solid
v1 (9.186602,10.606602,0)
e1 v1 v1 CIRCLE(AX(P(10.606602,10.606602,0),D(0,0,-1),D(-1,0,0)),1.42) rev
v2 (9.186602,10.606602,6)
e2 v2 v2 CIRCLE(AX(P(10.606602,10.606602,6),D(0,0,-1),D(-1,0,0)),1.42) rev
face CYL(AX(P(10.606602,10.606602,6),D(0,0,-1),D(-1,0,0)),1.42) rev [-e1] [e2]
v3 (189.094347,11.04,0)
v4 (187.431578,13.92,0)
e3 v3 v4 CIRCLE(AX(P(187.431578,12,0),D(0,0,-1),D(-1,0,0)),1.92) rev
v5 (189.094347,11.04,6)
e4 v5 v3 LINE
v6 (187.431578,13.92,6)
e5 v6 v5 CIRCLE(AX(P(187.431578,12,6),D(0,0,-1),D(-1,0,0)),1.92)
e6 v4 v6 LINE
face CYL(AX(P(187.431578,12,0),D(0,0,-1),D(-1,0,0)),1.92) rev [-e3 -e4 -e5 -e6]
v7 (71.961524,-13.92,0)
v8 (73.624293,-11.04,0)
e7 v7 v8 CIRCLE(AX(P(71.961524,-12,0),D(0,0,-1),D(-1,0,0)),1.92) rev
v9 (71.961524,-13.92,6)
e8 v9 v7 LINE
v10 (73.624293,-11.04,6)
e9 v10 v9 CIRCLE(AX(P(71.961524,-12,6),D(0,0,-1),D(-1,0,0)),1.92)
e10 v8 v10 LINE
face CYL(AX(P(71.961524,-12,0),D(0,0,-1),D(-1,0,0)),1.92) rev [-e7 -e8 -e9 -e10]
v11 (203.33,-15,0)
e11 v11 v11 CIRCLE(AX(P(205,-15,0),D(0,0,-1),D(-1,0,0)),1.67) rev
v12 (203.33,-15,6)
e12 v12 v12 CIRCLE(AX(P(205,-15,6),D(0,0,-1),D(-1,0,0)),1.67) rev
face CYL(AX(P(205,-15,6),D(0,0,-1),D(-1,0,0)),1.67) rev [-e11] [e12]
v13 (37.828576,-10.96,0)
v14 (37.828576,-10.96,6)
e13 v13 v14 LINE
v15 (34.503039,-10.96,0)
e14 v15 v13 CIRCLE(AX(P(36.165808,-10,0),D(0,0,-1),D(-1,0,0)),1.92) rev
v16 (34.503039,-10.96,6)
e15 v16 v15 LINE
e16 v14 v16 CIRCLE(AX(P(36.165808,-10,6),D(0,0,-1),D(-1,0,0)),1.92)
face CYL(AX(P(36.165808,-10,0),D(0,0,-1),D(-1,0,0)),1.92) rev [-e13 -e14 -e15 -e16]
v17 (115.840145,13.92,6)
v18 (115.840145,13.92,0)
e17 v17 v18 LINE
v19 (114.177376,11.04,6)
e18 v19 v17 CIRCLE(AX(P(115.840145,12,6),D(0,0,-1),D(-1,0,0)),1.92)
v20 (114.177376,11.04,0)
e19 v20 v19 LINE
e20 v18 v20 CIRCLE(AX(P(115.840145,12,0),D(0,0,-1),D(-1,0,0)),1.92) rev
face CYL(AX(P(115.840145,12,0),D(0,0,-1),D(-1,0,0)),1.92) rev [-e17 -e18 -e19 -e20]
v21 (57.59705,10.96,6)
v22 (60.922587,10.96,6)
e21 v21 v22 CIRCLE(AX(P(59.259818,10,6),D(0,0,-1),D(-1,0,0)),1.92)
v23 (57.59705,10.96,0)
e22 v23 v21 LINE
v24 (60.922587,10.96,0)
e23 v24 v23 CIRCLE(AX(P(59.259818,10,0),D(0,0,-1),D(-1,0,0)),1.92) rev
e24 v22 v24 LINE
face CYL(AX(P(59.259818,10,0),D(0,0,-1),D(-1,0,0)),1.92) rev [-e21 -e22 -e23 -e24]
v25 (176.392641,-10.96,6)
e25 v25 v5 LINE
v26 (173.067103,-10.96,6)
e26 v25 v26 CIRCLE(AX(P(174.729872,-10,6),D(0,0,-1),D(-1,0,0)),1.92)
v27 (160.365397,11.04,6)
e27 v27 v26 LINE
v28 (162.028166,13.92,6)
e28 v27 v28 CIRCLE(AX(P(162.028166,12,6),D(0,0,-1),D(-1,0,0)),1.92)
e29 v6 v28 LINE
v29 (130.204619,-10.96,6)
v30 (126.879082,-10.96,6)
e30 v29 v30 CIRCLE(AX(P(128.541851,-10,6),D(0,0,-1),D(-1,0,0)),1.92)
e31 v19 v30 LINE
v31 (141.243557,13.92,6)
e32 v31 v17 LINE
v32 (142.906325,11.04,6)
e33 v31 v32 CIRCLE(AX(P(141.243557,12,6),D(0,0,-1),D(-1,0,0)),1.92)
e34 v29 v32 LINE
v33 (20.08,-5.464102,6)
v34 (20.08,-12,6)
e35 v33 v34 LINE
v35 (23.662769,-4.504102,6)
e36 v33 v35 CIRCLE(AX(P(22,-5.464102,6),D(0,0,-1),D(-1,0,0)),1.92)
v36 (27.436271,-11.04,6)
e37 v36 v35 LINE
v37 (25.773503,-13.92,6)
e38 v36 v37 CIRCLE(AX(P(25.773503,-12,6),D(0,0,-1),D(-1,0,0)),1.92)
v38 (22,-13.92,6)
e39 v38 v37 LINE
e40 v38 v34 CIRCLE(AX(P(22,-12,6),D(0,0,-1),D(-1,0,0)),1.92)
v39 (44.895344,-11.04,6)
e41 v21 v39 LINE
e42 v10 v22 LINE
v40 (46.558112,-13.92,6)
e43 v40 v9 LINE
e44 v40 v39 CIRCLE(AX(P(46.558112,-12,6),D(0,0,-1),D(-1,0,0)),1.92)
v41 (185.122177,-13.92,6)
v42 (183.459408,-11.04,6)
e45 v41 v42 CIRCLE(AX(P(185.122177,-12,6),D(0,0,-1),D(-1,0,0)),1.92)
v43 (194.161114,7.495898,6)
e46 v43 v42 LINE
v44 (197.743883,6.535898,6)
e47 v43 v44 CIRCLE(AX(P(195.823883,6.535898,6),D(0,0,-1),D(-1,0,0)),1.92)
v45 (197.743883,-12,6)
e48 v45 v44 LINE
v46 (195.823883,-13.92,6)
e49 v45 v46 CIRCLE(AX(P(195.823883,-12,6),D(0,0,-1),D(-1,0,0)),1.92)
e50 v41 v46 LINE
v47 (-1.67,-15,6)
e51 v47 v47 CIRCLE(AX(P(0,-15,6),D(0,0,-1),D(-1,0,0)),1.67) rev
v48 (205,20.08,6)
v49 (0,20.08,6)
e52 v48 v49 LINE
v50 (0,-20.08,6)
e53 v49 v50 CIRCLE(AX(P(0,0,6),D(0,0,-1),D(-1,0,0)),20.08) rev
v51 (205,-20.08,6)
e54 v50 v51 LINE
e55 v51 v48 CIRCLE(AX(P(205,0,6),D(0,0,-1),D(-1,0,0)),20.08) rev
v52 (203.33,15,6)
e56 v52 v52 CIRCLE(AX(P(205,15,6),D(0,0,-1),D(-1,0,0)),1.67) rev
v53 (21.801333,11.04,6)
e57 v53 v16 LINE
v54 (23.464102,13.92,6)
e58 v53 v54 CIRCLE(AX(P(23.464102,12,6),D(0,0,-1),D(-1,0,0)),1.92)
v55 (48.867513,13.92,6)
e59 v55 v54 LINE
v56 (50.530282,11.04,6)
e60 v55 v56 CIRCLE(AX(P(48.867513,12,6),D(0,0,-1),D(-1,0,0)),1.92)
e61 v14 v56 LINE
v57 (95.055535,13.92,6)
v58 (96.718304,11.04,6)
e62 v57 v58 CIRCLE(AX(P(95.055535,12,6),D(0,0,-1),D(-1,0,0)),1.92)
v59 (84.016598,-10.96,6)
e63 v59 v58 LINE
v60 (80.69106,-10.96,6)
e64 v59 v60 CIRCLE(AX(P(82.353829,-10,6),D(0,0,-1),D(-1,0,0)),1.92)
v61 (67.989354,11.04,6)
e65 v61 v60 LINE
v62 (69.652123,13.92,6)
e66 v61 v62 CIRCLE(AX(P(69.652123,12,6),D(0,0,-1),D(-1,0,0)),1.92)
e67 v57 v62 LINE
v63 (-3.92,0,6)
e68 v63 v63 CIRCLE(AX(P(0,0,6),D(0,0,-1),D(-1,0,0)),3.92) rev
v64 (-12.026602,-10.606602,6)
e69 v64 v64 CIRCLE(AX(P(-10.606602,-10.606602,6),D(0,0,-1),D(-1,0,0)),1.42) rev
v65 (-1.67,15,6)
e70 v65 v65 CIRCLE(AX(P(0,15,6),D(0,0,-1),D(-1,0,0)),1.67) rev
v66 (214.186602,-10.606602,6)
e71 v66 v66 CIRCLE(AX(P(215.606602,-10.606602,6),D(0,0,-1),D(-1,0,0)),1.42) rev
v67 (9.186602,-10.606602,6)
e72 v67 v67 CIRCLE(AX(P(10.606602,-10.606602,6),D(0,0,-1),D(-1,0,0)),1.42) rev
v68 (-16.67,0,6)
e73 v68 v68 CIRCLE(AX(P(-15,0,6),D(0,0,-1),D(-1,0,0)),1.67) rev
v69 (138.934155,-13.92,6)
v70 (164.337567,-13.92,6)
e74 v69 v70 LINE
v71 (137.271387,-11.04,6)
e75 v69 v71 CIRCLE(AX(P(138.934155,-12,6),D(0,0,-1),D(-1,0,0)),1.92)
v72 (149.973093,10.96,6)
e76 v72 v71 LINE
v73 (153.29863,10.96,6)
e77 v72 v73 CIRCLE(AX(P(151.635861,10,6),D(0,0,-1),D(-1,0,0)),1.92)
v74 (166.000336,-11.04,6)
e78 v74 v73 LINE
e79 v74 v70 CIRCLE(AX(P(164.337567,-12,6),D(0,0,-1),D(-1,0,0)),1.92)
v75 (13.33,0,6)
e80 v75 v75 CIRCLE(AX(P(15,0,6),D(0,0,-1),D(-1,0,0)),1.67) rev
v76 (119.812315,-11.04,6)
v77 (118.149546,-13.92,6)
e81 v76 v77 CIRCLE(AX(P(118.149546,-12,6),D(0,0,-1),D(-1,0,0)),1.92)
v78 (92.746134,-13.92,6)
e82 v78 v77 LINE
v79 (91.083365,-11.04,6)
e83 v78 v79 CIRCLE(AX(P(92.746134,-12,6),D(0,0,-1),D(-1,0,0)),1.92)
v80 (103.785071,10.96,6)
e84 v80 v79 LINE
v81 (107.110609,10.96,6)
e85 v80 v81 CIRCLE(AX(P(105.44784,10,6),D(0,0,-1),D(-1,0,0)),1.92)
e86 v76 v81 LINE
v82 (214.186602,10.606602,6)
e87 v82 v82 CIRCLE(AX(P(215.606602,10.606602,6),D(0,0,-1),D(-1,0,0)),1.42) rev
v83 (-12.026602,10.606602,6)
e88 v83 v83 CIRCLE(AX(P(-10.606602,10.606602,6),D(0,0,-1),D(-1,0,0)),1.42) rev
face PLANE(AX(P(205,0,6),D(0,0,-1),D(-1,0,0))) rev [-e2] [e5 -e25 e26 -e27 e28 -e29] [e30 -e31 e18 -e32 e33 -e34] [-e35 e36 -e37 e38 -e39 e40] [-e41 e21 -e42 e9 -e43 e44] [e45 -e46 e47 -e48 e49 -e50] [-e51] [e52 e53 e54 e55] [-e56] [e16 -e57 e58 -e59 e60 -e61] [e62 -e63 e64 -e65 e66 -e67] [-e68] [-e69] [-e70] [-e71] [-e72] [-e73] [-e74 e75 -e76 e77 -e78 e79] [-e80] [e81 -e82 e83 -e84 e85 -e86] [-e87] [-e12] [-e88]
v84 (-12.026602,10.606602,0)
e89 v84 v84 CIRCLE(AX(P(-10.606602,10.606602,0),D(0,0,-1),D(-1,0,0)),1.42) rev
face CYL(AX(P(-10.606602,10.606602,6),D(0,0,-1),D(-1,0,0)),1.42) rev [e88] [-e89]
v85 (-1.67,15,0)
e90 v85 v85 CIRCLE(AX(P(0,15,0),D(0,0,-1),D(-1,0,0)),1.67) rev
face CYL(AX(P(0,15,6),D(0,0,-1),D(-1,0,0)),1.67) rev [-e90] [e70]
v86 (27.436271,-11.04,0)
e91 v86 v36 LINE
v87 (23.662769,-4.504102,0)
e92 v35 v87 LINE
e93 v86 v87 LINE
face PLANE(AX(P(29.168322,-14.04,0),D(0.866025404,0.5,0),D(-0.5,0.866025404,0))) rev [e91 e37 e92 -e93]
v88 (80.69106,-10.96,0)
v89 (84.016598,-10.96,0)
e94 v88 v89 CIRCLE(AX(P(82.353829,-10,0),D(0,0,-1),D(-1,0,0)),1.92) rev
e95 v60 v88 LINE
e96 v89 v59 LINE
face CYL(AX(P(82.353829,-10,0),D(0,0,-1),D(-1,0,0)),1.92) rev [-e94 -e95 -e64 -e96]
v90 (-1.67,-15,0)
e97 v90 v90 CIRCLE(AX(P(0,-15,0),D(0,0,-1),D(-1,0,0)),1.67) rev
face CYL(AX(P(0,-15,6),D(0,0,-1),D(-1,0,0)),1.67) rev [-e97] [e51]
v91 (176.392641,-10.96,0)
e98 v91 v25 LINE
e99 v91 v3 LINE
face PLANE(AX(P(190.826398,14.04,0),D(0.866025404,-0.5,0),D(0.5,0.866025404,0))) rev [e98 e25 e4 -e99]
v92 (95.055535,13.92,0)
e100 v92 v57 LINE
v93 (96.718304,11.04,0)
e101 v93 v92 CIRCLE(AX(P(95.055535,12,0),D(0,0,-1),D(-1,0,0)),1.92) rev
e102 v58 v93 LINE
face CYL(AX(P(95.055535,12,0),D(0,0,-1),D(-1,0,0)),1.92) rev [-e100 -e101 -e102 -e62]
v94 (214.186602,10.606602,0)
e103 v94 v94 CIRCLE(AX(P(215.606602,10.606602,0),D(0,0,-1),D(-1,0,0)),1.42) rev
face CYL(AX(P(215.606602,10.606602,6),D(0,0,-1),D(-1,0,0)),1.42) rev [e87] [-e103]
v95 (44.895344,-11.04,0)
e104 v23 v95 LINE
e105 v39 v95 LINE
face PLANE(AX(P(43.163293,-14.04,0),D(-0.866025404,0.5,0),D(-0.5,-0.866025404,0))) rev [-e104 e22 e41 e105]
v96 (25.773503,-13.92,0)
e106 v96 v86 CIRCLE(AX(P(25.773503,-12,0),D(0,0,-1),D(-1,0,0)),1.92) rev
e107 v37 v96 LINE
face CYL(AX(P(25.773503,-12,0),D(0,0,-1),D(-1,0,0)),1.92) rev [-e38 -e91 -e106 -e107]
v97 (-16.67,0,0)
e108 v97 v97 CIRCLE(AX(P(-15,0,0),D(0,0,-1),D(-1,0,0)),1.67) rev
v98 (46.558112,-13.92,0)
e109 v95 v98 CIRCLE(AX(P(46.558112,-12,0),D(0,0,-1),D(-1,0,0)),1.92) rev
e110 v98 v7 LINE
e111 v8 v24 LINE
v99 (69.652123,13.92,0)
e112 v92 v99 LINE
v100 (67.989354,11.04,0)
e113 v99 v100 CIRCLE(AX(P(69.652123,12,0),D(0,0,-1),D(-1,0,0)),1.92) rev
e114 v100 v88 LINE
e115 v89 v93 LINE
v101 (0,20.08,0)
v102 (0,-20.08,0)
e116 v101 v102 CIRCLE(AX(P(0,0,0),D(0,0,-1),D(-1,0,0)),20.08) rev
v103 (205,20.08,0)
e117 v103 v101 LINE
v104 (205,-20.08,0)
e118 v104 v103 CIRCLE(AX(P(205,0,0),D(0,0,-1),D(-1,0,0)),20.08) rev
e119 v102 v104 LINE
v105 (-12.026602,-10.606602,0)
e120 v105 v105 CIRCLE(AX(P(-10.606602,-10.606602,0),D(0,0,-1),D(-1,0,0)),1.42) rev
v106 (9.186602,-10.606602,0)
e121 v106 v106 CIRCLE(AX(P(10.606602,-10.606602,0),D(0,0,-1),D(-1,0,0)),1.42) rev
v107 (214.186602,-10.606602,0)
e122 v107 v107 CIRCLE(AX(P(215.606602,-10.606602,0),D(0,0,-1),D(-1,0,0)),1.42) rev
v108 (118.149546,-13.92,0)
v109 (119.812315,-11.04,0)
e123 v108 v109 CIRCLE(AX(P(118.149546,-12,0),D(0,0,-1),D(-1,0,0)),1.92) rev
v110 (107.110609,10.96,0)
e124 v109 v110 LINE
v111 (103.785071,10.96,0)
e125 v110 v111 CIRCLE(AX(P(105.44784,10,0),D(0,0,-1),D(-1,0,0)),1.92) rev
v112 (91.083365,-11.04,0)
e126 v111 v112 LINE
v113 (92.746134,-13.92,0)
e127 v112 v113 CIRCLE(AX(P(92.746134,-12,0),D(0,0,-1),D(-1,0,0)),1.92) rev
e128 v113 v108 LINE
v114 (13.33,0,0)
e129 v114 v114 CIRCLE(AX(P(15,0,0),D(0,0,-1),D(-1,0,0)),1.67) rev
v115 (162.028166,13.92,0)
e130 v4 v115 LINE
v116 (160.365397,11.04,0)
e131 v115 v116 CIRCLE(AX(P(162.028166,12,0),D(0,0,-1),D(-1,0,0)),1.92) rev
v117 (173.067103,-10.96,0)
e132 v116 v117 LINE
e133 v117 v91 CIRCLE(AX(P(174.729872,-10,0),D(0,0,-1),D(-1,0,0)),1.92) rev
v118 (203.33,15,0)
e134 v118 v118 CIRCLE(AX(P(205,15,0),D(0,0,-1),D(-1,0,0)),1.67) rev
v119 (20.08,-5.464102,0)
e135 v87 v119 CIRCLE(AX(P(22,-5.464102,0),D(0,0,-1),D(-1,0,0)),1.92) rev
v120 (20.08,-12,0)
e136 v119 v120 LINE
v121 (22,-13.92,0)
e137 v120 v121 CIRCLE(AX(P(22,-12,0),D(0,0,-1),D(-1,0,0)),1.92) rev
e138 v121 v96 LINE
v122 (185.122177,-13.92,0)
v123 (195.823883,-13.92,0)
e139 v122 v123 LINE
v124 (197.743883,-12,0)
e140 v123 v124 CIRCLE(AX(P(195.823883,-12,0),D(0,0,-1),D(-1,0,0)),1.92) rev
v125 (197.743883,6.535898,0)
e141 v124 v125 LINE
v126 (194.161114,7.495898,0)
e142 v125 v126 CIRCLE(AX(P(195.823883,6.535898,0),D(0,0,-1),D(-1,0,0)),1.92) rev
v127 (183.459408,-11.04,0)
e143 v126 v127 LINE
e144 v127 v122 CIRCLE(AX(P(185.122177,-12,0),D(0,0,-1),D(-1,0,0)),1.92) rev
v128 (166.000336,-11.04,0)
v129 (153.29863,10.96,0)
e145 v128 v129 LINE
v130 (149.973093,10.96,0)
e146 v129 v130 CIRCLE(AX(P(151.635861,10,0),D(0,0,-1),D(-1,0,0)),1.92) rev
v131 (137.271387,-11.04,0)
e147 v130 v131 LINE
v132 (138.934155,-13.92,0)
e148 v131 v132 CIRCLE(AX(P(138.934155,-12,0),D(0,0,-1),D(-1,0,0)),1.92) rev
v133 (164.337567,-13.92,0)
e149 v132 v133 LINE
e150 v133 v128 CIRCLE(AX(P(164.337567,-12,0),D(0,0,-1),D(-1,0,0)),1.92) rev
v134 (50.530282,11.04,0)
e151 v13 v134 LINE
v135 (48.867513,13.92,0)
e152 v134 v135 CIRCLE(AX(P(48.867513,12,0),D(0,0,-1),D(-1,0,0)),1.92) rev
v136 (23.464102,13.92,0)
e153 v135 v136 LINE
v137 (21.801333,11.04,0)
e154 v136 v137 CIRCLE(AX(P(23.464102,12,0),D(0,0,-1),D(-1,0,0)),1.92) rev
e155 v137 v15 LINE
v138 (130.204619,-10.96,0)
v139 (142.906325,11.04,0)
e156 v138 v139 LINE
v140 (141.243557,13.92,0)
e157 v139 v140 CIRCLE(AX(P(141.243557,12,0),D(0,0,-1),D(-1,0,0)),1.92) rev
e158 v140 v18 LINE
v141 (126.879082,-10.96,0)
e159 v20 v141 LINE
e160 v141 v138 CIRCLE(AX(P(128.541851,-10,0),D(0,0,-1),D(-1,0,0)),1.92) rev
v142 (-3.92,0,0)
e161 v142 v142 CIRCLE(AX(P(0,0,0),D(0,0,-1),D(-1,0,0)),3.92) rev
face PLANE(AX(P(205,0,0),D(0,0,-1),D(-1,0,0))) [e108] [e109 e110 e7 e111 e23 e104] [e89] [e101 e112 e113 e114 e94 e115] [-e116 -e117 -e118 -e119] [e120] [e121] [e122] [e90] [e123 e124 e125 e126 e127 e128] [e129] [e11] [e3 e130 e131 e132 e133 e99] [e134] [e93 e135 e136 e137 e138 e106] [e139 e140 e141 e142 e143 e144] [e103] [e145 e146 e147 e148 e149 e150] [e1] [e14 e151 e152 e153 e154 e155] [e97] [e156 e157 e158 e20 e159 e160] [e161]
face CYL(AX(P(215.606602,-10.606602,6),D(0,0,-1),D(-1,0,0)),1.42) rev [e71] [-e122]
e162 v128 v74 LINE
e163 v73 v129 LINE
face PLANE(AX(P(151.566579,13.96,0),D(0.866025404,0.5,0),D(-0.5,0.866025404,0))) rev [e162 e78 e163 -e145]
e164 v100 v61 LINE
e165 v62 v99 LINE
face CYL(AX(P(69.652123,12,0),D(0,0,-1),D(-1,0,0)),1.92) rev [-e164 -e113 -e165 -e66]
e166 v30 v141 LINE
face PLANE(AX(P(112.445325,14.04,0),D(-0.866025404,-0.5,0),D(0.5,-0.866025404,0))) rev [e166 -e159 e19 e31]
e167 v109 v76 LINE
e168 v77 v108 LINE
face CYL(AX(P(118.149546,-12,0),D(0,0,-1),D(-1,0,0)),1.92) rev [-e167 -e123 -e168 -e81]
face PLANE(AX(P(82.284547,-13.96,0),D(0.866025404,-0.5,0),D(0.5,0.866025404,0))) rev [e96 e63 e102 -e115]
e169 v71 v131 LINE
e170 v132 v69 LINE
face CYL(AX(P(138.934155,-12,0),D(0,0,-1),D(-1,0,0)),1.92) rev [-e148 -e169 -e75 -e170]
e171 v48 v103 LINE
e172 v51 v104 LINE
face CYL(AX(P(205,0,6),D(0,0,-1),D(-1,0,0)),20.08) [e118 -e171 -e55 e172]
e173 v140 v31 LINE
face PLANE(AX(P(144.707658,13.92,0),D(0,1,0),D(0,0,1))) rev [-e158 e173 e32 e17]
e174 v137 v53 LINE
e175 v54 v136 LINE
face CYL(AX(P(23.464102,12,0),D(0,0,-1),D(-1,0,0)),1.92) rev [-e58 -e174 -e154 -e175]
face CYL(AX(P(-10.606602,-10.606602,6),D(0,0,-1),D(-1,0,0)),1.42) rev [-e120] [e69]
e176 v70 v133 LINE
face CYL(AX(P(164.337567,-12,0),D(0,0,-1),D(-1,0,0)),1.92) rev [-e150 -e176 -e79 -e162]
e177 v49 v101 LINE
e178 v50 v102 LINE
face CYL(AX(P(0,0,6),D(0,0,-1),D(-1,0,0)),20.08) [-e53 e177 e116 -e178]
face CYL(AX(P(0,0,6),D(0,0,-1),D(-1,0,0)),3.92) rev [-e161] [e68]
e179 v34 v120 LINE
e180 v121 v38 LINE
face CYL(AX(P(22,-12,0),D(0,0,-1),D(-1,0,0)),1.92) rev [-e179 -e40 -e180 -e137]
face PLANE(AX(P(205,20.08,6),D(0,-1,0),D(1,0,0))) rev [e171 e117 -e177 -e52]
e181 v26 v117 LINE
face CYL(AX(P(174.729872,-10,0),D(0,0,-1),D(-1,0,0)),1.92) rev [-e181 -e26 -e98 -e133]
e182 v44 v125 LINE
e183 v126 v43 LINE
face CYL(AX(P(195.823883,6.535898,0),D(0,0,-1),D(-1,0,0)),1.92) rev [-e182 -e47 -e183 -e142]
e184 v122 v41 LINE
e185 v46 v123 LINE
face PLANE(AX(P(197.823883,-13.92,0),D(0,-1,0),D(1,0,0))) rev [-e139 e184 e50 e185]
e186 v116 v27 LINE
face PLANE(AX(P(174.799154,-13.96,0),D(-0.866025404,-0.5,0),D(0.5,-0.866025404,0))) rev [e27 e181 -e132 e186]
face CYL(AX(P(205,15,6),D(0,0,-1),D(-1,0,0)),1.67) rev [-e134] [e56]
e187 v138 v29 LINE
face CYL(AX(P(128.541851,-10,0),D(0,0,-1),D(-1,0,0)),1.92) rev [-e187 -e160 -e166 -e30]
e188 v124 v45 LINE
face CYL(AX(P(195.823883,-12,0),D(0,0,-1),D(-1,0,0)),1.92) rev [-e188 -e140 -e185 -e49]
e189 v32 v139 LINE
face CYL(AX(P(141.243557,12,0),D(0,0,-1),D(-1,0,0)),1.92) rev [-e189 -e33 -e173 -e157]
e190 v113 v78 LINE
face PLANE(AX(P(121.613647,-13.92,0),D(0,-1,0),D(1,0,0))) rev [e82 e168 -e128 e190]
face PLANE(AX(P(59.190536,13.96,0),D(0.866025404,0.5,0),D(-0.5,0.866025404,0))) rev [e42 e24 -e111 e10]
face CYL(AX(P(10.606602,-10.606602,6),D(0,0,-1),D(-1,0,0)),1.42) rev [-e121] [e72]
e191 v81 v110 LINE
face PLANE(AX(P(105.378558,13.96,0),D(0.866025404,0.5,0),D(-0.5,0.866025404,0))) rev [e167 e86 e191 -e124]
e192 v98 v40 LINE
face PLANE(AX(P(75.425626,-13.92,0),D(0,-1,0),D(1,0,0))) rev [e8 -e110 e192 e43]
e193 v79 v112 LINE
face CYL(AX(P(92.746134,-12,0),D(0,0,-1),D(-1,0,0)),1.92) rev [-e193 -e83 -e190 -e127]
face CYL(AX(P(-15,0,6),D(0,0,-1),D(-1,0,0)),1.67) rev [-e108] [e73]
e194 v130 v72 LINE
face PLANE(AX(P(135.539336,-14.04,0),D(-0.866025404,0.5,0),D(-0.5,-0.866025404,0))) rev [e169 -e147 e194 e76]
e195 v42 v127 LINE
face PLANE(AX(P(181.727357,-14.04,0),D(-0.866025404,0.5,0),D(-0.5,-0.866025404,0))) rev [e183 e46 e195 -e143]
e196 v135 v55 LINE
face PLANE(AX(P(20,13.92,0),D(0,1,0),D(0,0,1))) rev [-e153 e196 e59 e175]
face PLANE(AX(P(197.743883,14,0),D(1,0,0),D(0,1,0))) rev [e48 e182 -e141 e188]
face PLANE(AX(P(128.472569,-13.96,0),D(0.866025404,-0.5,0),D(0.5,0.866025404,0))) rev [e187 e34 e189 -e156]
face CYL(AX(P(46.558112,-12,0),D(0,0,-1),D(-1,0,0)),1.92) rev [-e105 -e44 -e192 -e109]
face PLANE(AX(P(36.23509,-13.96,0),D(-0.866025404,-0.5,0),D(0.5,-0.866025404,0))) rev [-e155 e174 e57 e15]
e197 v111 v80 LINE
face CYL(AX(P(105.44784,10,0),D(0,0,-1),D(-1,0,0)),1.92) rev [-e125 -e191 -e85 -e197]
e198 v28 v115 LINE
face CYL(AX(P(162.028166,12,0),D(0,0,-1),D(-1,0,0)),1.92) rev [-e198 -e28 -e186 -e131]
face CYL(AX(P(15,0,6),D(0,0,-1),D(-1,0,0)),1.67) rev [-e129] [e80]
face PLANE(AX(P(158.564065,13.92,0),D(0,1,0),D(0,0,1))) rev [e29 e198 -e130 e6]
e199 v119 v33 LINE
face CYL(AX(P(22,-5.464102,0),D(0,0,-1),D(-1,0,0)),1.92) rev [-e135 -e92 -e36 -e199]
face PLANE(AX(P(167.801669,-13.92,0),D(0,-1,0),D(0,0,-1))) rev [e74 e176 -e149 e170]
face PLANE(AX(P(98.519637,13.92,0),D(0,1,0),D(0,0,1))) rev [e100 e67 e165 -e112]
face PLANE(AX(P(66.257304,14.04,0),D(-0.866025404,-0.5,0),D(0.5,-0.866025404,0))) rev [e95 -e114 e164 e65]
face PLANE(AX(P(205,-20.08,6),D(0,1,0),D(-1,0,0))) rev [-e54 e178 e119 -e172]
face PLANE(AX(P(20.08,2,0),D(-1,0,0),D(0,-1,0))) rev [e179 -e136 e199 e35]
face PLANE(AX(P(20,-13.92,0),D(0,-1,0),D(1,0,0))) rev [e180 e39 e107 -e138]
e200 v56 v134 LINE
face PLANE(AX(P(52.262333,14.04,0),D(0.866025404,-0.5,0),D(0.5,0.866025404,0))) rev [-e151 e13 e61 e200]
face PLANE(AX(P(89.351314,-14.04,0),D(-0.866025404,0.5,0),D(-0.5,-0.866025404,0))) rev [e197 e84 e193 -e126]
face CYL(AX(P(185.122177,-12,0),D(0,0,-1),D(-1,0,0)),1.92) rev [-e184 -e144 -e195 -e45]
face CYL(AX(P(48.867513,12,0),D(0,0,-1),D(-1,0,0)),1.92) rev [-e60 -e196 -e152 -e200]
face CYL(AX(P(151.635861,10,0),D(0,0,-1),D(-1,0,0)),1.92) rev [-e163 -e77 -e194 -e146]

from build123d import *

# Parameters (mm, degrees)
SKETCH1_R              = 4
SKETCH1_R_2            = 1.75
SKETCH1_R_3            = 1.5
BOSS_EXTRUDE1_DEPTH    = 6
CUT_EXTRUDE1_DEPTH     = 226.966811722
FILLET1_R              = 2
MOVE_FACE1_OUTLINE_R   = 4
MOVE_FACE1_OUTLINE_R_2 = 3.92
MOVE_FACE1_OUTLINE_R_3 = 1.75
MOVE_FACE1_OUTLINE_R_4 = 1.67
MOVE_FACE1_OUTLINE_R_5 = 1.5
MOVE_FACE1_OUTLINE_R_6 = 1.42
MOVE_FACE1_DEPTH       = 6


# Read off the part's stored shape, not the designer's step: Move Face1
with BuildPart() as part:
    # Sketch1 → Boss-Extrude1 (new body)
    with BuildSketch(Plane.XY):
        with BuildLine():
            Line((205, 20), (0, 20))
            ThreePointArc((0, 20), (-20, 0), (0, -20))
            Line((0, -20), (205, -20))
            ThreePointArc((205, -20), (225, 0), (205, 20))
        make_face()
        Circle(SKETCH1_R, mode=Mode.SUBTRACT)
        with Locations((205, -15)):
            Circle(SKETCH1_R_2, mode=Mode.SUBTRACT)
        with Locations((215.606601718, -10.606601718)):
            Circle(SKETCH1_R_3, mode=Mode.SUBTRACT)
        with Locations((205, 15)):
            Circle(SKETCH1_R_2, mode=Mode.SUBTRACT)
        with Locations((215.606601718, 10.606601718)):
            Circle(SKETCH1_R_3, mode=Mode.SUBTRACT)
        with Locations((0, -15)):
            Circle(SKETCH1_R_2, mode=Mode.SUBTRACT)
        with Locations((10.606601718, -10.606601718)):
            Circle(SKETCH1_R_3, mode=Mode.SUBTRACT)
        with Locations((-15, 0)):
            Circle(SKETCH1_R_2, mode=Mode.SUBTRACT)
        with Locations((-10.606601718, -10.606601718)):
            Circle(SKETCH1_R_3, mode=Mode.SUBTRACT)
        with Locations((0, 15)):
            Circle(SKETCH1_R_2, mode=Mode.SUBTRACT)
        with Locations((-10.606601718, 10.606601718)):
            Circle(SKETCH1_R_3, mode=Mode.SUBTRACT)
        with Locations((15, 0)):
            Circle(SKETCH1_R_2, mode=Mode.SUBTRACT)
        with Locations((10.606601718, 10.606601718)):
            Circle(SKETCH1_R_3, mode=Mode.SUBTRACT)
    extrude(amount=BOSS_EXTRUDE1_DEPTH)

    # Sketch2 → Cut-Extrude1 (cut, through all)
    with BuildSketch(Plane.XY.offset(6)):
        Polygon((20, 14), (52.331615075, 14), (36.165807537, -14), align=None)
        Polygon((43.094010768, -14), (59.259818305, 14), (75.425625842, -14), align=None)
        Polygon((66.188021535, 14), (82.353829072, -14), (98.51963661, 14), align=None)
        Polygon((89.282032303, -14), (105.44783984, 14), (121.613647377, -14), align=None)
        Polygon((112.37604307, 14), (128.541850608, -14), (144.707658145, 14), align=None)
        Polygon((20, 2), (20, -14), (29.237604307, -14), align=None)
        Polygon((135.470053838, -14), (151.635861375, 14), (167.801668913, -14), align=None)
        Polygon((174.729872143, -14), (158.564064606, 14), (190.89567968, 14), align=None)
        Polygon((181.658075373, -14), (197.82388291, 14), (197.82388291, -14), align=None)
    extrude(amount=-CUT_EXTRUDE1_DEPTH, mode=Mode.SUBTRACT)

    # Fillet1
    fillet1_edges = [part.edges().sort_by_distance(p)[0] for p in [
        (121.613647377, -14, 3),
        (89.282032303, -14, 3),
        (105.44783984, 14, 3),
        (112.37604307, 14, 3),
        (144.707658145, 14, 3),
        (128.541850608, -14, 3),
        (20, 2, 3),
        (29.237604307, -14, 3),
        (20, -14, 3),
        (167.801668913, -14, 3),
        (135.470053838, -14, 3),
        (151.635861375, 14, 3),
        (190.89567968, 14, 3),
        (174.729872143, -14, 3),
        (158.564064606, 14, 3),
        (197.82388291, -14, 3),
        (181.658075373, -14, 3),
        (197.82388291, 14, 3),
        (36.165807537, -14, 3),
        (20, 14, 3),
        (52.331615075, 14, 3),
        (75.425625842, -14, 3),
        (43.094010768, -14, 3),
        (59.259818305, 14, 3),
        (66.188021535, 14, 3),
        (98.51963661, 14, 3),
        (82.353829072, -14, 3),
    ]]
    fillet(fillet1_edges, radius=FILLET1_R)

    # Move Face1 outline → Move Face1 (add)
    # profile 1 of 23: a face of its own
    with BuildSketch(Plane.XY):
        with BuildLine():
            ThreePointArc((205, -20.08), (225.08, 0), (205, 20.08))
            Line((205, 20.08), (0, 20.08))
            ThreePointArc((0, 20.08), (-20.08, 0), (0, -20.08))
            Line((0, -20.08), (205, -20.08))
        make_face()
        with BuildLine():
            Line((0, 20), (205, 20))
            ThreePointArc((205, 20), (225, 0), (205, -20))
            Line((205, -20), (0, -20))
            ThreePointArc((0, -20), (-20, 0), (0, 20))
        make_face(mode=Mode.SUBTRACT)
    # profile 2 of 23: a face of its own
    with BuildSketch(Plane.XY):
        Circle(MOVE_FACE1_OUTLINE_R)
        Circle(MOVE_FACE1_OUTLINE_R_2, mode=Mode.SUBTRACT)
    # profile 3 of 23: a face of its own
    with BuildSketch(Plane.XY):
        with Locations((205, -15)):
            Circle(MOVE_FACE1_OUTLINE_R_3)
        with Locations((205, -15)):
            Circle(MOVE_FACE1_OUTLINE_R_4, mode=Mode.SUBTRACT)
    # profile 4 of 23: a face of its own
    with BuildSketch(Plane.XY):
        with Locations((215.606601718, -10.606601718)):
            Circle(MOVE_FACE1_OUTLINE_R_5)
        with Locations((215.606601718, -10.606601718)):
            Circle(MOVE_FACE1_OUTLINE_R_6, mode=Mode.SUBTRACT)
    # profile 5 of 23: a face of its own
    with BuildSketch(Plane.XY):
        with Locations((205, 15)):
            Circle(MOVE_FACE1_OUTLINE_R_3)
        with Locations((205, 15)):
            Circle(MOVE_FACE1_OUTLINE_R_4, mode=Mode.SUBTRACT)
    # profile 6 of 23: a face of its own
    with BuildSketch(Plane.XY):
        with Locations((215.606601718, 10.606601718)):
            Circle(MOVE_FACE1_OUTLINE_R_5)
        with Locations((215.606601718, 10.606601718)):
            Circle(MOVE_FACE1_OUTLINE_R_6, mode=Mode.SUBTRACT)
    # profile 7 of 23: a face of its own
    with BuildSketch(Plane.XY):
        with Locations((0, -15)):
            Circle(MOVE_FACE1_OUTLINE_R_3)
        with Locations((0, -15)):
            Circle(MOVE_FACE1_OUTLINE_R_4, mode=Mode.SUBTRACT)
    # profile 8 of 23: a face of its own
    with BuildSketch(Plane.XY):
        with Locations((10.606601718, -10.606601718)):
            Circle(MOVE_FACE1_OUTLINE_R_5)
        with Locations((10.606601718, -10.606601718)):
            Circle(MOVE_FACE1_OUTLINE_R_6, mode=Mode.SUBTRACT)
    # profile 9 of 23: a face of its own
    with BuildSketch(Plane.XY):
        with Locations((-15, 0)):
            Circle(MOVE_FACE1_OUTLINE_R_3)
        with Locations((-15, 0)):
            Circle(MOVE_FACE1_OUTLINE_R_4, mode=Mode.SUBTRACT)
    # profile 10 of 23: a face of its own
    with BuildSketch(Plane.XY):
        with Locations((-10.606601718, -10.606601718)):
            Circle(MOVE_FACE1_OUTLINE_R_5)
        with Locations((-10.606601718, -10.606601718)):
            Circle(MOVE_FACE1_OUTLINE_R_6, mode=Mode.SUBTRACT)
    # profile 11 of 23: a face of its own
    with BuildSketch(Plane.XY):
        with Locations((0, 15)):
            Circle(MOVE_FACE1_OUTLINE_R_3)
        with Locations((0, 15)):
            Circle(MOVE_FACE1_OUTLINE_R_4, mode=Mode.SUBTRACT)
    # profile 12 of 23: a face of its own
    with BuildSketch(Plane.XY):
        with Locations((-10.606601718, 10.606601718)):
            Circle(MOVE_FACE1_OUTLINE_R_5)
        with Locations((-10.606601718, 10.606601718)):
            Circle(MOVE_FACE1_OUTLINE_R_6, mode=Mode.SUBTRACT)
    # profile 13 of 23: a face of its own
    with BuildSketch(Plane.XY):
        with Locations((15, 0)):
            Circle(MOVE_FACE1_OUTLINE_R_3)
        with Locations((15, 0)):
            Circle(MOVE_FACE1_OUTLINE_R_4, mode=Mode.SUBTRACT)
    # profile 14 of 23: a face of its own
    with BuildSketch(Plane.XY):
        with Locations((10.606601718, 10.606601718)):
            Circle(MOVE_FACE1_OUTLINE_R_5)
        with Locations((10.606601718, 10.606601718)):
            Circle(MOVE_FACE1_OUTLINE_R_6, mode=Mode.SUBTRACT)
    # profile 15 of 23: a face of its own
    with BuildSketch(Plane.XY):
        with BuildLine():
            ThreePointArc((23.464101615, 14), (21.732050808, 13), (21.732050808, 11))
            Line((21.732050808, 11), (34.43375673, -11))
            ThreePointArc((34.43375673, -11), (36.165807538, -12), (37.897858345, -11))
            Line((37.897858345, -11), (50.599564267, 11))
            ThreePointArc((50.599564267, 11), (50.599564267, 13), (48.867513459, 14))
            Line((48.867513459, 14), (23.464101615, 14))
        make_face()
        with BuildLine():
            Line((34.503038762, -10.96), (21.80133284, 11.04))
            ThreePointArc((21.80133284, 11.04), (21.80133284, 12.96), (23.464101615, 13.92))
            Line((23.464101615, 13.92), (48.867513459, 13.92))
            ThreePointArc((48.867513459, 13.92), (50.530282235, 12.96), (50.530282235, 11.04))
            Line((50.530282235, 11.04), (37.828576313, -10.96))
            ThreePointArc((37.828576313, -10.96), (36.165807538, -11.92), (34.503038762, -10.96))
        make_face(mode=Mode.SUBTRACT)
    # profile 16 of 23: a face of its own
    with BuildSketch(Plane.XY):
        with BuildLine():
            ThreePointArc((96.787585802, 11), (96.787585802, 13), (95.055534995, 14))
            Line((95.055534995, 14), (69.65212315, 14))
            ThreePointArc((69.65212315, 14), (67.920072343, 13), (67.920072343, 11))
            Line((67.920072343, 11), (80.621778265, -11))
            ThreePointArc((80.621778265, -11), (82.353829072, -12), (84.08587988, -11))
            Line((84.08587988, -11), (96.787585802, 11))
        make_face()
        with BuildLine():
            Line((69.65212315, 13.92), (95.055534995, 13.92))
            ThreePointArc((95.055534995, 13.92), (96.71830377, 12.96), (96.71830377, 11.04))
            Line((96.71830377, 11.04), (84.016597848, -10.96))
            ThreePointArc((84.016597848, -10.96), (82.353829073, -11.92), (80.691060297, -10.96))
            Line((80.691060297, -10.96), (67.989354375, 11.04))
            ThreePointArc((67.989354375, 11.04), (67.989354375, 12.96), (69.65212315, 13.92))
        make_face(mode=Mode.SUBTRACT)
    # profile 17 of 23: a face of its own
    with BuildSketch(Plane.XY):
        with BuildLine():
            ThreePointArc((142.975607337, 11), (142.975607337, 13), (141.24355653, 14))
            Line((141.24355653, 14), (115.840144685, 14))
            ThreePointArc((115.840144685, 14), (114.108093878, 13), (114.108093878, 11))
            Line((114.108093878, 11), (126.8097998, -11))
            ThreePointArc((126.8097998, -11), (128.541850608, -12), (130.273901415, -11))
            Line((130.273901415, -11), (142.975607337, 11))
        make_face()
        with BuildLine():
            Line((115.840144685, 13.92), (141.24355653, 13.92))
            ThreePointArc((141.24355653, 13.92), (142.906325305, 12.96), (142.906325305, 11.04))
            Line((142.906325305, 11.04), (130.204619383, -10.96))
            ThreePointArc((130.204619383, -10.96), (128.541850608, -11.92), (126.879081832, -10.96))
            Line((126.879081832, -10.96), (114.17737591, 11.04))
            ThreePointArc((114.17737591, 11.04), (114.17737591, 12.96), (115.840144685, 13.92))
        make_face(mode=Mode.SUBTRACT)
    # profile 18 of 23: a face of its own
    with BuildSketch(Plane.XY):
        with BuildLine():
            ThreePointArc((189.163628873, 11), (189.163628873, 13), (187.431578065, 14))
            Line((187.431578065, 14), (162.028166221, 14))
            ThreePointArc((162.028166221, 14), (160.296115413, 13), (160.296115413, 11))
            Line((160.296115413, 11), (172.997821335, -11))
            ThreePointArc((172.997821335, -11), (174.729872142, -12), (176.46192295, -11))
            Line((176.46192295, -11), (189.163628873, 11))
        make_face()
        with BuildLine():
            Line((162.028166221, 13.92), (187.431578065, 13.92))
            ThreePointArc((187.431578065, 13.92), (189.09434684, 12.96), (189.09434684, 11.04))
            Line((189.09434684, 11.04), (176.392640918, -10.96))
            ThreePointArc((176.392640918, -10.96), (174.729872143, -11.92), (173.067103368, -10.96))
            Line((173.067103368, -10.96), (160.365397445, 11.04))
            ThreePointArc((160.365397445, 11.04), (160.365397445, 12.96), (162.028166221, 13.92))
        make_face(mode=Mode.SUBTRACT)
    # profile 19 of 23: a face of its own
    with BuildSketch(Plane.XY):
        with BuildLine():
            ThreePointArc((44.826061575, -11), (44.826061575, -13), (46.558112383, -14))
            Line((46.558112383, -14), (71.961524227, -14))
            ThreePointArc((71.961524227, -14), (73.693575035, -13), (73.693575035, -11))
            Line((73.693575035, -11), (60.991869112, 11))
            ThreePointArc((60.991869112, 11), (59.259818305, 12), (57.527767497, 11))
            Line((57.527767497, 11), (44.826061575, -11))
        make_face()
        with BuildLine():
            Line((71.961524227, -13.92), (46.558112383, -13.92))
            ThreePointArc((46.558112383, -13.92), (44.895343607, -12.96), (44.895343607, -11.04))
            Line((44.895343607, -11.04), (57.59704953, 10.96))
            ThreePointArc((57.59704953, 10.96), (59.259818305, 11.92), (60.92258708, 10.96))
            Line((60.92258708, 10.96), (73.624293002, -11.04))
            ThreePointArc((73.624293002, -11.04), (73.624293002, -12.96), (71.961524227, -13.92))
        make_face(mode=Mode.SUBTRACT)
    # profile 20 of 23: a face of its own
    with BuildSketch(Plane.XY):
        with BuildLine():
            ThreePointArc((91.01408311, -11), (91.01408311, -13), (92.746133918, -14))
            Line((92.746133918, -14), (118.149545762, -14))
            ThreePointArc((118.149545762, -14), (119.88159657, -13), (119.88159657, -11))
            Line((119.88159657, -11), (107.179890648, 11))
            ThreePointArc((107.179890648, 11), (105.44783984, 12), (103.715789032, 11))
            Line((103.715789032, 11), (91.01408311, -11))
        make_face()
        with BuildLine():
            Line((118.149545762, -13.92), (92.746133918, -13.92))
            ThreePointArc((92.746133918, -13.92), (91.083365143, -12.96), (91.083365143, -11.04))
            Line((91.083365143, -11.04), (103.785071065, 10.96))
            ThreePointArc((103.785071065, 10.96), (105.44783984, 11.92), (107.110608615, 10.96))
            Line((107.110608615, 10.96), (119.812314538, -11.04))
            ThreePointArc((119.812314538, -11.04), (119.812314538, -12.96), (118.149545762, -13.92))
        make_face(mode=Mode.SUBTRACT)
    # profile 21 of 23: a face of its own
    with BuildSketch(Plane.XY):
        with BuildLine():
            ThreePointArc((20, -12), (20.585786438, -13.414213562), (22, -14))
            Line((22, -14), (25.773502692, -14))
            ThreePointArc((25.773502692, -14), (27.505553499, -13), (27.505553499, -11))
            Line((27.505553499, -11), (23.732050808, -4.464101615))
            ThreePointArc((23.732050808, -4.464101615), (21.48236191, -3.532249963), (20, -5.464101615))
            Line((20, -5.464101615), (20, -12))
        make_face()
        with BuildLine():
            Line((25.773502692, -13.92), (22, -13.92))
            ThreePointArc((22, -13.92), (20.64235498, -13.35764502), (20.08, -12))
            Line((20.08, -12), (20.08, -5.464101615))
            ThreePointArc((20.08, -5.464101615), (21.503067433, -3.609524029), (23.662768775, -4.504101615))
            Line((23.662768775, -4.504101615), (27.436271467, -11.04))
            ThreePointArc((27.436271467, -11.04), (27.436271467, -12.96), (25.773502692, -13.92))
        make_face(mode=Mode.SUBTRACT)
    # profile 22 of 23: a face of its own
    with BuildSketch(Plane.XY):
        with BuildLine():
            ThreePointArc((137.202104645, -11), (137.202104645, -13), (138.934155453, -14))
            Line((138.934155453, -14), (164.337567297, -14))
            ThreePointArc((164.337567297, -14), (166.069618105, -13), (166.069618105, -11))
            Line((166.069618105, -11), (153.367912183, 11))
            ThreePointArc((153.367912183, 11), (151.635861376, 12), (149.903810568, 11))
            Line((149.903810568, 11), (137.202104645, -11))
        make_face()
        with BuildLine():
            Line((164.337567297, -13.92), (138.934155453, -13.92))
            ThreePointArc((138.934155453, -13.92), (137.271386678, -12.96), (137.271386678, -11.04))
            Line((137.271386678, -11.04), (149.9730926, 10.96))
            ThreePointArc((149.9730926, 10.96), (151.635861375, 11.92), (153.298630151, 10.96))
            Line((153.298630151, 10.96), (166.000336073, -11.04))
            ThreePointArc((166.000336073, -11.04), (166.000336073, -12.96), (164.337567297, -13.92))
        make_face(mode=Mode.SUBTRACT)
    # profile 23 of 23: a face of its own
    with BuildSketch(Plane.XY):
        with BuildLine():
            ThreePointArc((183.390126181, -11), (183.390126181, -13), (185.122176988, -14))
            Line((185.122176988, -14), (195.82388291, -14))
            ThreePointArc((195.82388291, -14), (197.238096473, -13.414213563), (197.82388291, -12))
            Line((197.82388291, -12), (197.82388291, 6.535898385))
            ThreePointArc((197.82388291, 6.535898385), (196.341521, 8.467750037), (194.091832103, 7.535898385))
            Line((194.091832103, 7.535898385), (183.390126181, -11))
        make_face()
        with BuildLine():
            Line((195.82388291, -13.92), (185.122176988, -13.92))
            ThreePointArc((185.122176988, -13.92), (183.459408213, -12.96), (183.459408213, -11.04))
            Line((183.459408213, -11.04), (194.161114135, 7.495898385))
            ThreePointArc((194.161114135, 7.495898385), (196.320815477, 8.390475971), (197.74388291, 6.535898385))
            Line((197.74388291, 6.535898385), (197.74388291, -12))
            ThreePointArc((197.74388291, -12), (197.18152793, -13.35764502), (195.82388291, -13.92))
        make_face(mode=Mode.SUBTRACT)
    extrude(amount=MOVE_FACE1_DEPTH)


solid = part.part
